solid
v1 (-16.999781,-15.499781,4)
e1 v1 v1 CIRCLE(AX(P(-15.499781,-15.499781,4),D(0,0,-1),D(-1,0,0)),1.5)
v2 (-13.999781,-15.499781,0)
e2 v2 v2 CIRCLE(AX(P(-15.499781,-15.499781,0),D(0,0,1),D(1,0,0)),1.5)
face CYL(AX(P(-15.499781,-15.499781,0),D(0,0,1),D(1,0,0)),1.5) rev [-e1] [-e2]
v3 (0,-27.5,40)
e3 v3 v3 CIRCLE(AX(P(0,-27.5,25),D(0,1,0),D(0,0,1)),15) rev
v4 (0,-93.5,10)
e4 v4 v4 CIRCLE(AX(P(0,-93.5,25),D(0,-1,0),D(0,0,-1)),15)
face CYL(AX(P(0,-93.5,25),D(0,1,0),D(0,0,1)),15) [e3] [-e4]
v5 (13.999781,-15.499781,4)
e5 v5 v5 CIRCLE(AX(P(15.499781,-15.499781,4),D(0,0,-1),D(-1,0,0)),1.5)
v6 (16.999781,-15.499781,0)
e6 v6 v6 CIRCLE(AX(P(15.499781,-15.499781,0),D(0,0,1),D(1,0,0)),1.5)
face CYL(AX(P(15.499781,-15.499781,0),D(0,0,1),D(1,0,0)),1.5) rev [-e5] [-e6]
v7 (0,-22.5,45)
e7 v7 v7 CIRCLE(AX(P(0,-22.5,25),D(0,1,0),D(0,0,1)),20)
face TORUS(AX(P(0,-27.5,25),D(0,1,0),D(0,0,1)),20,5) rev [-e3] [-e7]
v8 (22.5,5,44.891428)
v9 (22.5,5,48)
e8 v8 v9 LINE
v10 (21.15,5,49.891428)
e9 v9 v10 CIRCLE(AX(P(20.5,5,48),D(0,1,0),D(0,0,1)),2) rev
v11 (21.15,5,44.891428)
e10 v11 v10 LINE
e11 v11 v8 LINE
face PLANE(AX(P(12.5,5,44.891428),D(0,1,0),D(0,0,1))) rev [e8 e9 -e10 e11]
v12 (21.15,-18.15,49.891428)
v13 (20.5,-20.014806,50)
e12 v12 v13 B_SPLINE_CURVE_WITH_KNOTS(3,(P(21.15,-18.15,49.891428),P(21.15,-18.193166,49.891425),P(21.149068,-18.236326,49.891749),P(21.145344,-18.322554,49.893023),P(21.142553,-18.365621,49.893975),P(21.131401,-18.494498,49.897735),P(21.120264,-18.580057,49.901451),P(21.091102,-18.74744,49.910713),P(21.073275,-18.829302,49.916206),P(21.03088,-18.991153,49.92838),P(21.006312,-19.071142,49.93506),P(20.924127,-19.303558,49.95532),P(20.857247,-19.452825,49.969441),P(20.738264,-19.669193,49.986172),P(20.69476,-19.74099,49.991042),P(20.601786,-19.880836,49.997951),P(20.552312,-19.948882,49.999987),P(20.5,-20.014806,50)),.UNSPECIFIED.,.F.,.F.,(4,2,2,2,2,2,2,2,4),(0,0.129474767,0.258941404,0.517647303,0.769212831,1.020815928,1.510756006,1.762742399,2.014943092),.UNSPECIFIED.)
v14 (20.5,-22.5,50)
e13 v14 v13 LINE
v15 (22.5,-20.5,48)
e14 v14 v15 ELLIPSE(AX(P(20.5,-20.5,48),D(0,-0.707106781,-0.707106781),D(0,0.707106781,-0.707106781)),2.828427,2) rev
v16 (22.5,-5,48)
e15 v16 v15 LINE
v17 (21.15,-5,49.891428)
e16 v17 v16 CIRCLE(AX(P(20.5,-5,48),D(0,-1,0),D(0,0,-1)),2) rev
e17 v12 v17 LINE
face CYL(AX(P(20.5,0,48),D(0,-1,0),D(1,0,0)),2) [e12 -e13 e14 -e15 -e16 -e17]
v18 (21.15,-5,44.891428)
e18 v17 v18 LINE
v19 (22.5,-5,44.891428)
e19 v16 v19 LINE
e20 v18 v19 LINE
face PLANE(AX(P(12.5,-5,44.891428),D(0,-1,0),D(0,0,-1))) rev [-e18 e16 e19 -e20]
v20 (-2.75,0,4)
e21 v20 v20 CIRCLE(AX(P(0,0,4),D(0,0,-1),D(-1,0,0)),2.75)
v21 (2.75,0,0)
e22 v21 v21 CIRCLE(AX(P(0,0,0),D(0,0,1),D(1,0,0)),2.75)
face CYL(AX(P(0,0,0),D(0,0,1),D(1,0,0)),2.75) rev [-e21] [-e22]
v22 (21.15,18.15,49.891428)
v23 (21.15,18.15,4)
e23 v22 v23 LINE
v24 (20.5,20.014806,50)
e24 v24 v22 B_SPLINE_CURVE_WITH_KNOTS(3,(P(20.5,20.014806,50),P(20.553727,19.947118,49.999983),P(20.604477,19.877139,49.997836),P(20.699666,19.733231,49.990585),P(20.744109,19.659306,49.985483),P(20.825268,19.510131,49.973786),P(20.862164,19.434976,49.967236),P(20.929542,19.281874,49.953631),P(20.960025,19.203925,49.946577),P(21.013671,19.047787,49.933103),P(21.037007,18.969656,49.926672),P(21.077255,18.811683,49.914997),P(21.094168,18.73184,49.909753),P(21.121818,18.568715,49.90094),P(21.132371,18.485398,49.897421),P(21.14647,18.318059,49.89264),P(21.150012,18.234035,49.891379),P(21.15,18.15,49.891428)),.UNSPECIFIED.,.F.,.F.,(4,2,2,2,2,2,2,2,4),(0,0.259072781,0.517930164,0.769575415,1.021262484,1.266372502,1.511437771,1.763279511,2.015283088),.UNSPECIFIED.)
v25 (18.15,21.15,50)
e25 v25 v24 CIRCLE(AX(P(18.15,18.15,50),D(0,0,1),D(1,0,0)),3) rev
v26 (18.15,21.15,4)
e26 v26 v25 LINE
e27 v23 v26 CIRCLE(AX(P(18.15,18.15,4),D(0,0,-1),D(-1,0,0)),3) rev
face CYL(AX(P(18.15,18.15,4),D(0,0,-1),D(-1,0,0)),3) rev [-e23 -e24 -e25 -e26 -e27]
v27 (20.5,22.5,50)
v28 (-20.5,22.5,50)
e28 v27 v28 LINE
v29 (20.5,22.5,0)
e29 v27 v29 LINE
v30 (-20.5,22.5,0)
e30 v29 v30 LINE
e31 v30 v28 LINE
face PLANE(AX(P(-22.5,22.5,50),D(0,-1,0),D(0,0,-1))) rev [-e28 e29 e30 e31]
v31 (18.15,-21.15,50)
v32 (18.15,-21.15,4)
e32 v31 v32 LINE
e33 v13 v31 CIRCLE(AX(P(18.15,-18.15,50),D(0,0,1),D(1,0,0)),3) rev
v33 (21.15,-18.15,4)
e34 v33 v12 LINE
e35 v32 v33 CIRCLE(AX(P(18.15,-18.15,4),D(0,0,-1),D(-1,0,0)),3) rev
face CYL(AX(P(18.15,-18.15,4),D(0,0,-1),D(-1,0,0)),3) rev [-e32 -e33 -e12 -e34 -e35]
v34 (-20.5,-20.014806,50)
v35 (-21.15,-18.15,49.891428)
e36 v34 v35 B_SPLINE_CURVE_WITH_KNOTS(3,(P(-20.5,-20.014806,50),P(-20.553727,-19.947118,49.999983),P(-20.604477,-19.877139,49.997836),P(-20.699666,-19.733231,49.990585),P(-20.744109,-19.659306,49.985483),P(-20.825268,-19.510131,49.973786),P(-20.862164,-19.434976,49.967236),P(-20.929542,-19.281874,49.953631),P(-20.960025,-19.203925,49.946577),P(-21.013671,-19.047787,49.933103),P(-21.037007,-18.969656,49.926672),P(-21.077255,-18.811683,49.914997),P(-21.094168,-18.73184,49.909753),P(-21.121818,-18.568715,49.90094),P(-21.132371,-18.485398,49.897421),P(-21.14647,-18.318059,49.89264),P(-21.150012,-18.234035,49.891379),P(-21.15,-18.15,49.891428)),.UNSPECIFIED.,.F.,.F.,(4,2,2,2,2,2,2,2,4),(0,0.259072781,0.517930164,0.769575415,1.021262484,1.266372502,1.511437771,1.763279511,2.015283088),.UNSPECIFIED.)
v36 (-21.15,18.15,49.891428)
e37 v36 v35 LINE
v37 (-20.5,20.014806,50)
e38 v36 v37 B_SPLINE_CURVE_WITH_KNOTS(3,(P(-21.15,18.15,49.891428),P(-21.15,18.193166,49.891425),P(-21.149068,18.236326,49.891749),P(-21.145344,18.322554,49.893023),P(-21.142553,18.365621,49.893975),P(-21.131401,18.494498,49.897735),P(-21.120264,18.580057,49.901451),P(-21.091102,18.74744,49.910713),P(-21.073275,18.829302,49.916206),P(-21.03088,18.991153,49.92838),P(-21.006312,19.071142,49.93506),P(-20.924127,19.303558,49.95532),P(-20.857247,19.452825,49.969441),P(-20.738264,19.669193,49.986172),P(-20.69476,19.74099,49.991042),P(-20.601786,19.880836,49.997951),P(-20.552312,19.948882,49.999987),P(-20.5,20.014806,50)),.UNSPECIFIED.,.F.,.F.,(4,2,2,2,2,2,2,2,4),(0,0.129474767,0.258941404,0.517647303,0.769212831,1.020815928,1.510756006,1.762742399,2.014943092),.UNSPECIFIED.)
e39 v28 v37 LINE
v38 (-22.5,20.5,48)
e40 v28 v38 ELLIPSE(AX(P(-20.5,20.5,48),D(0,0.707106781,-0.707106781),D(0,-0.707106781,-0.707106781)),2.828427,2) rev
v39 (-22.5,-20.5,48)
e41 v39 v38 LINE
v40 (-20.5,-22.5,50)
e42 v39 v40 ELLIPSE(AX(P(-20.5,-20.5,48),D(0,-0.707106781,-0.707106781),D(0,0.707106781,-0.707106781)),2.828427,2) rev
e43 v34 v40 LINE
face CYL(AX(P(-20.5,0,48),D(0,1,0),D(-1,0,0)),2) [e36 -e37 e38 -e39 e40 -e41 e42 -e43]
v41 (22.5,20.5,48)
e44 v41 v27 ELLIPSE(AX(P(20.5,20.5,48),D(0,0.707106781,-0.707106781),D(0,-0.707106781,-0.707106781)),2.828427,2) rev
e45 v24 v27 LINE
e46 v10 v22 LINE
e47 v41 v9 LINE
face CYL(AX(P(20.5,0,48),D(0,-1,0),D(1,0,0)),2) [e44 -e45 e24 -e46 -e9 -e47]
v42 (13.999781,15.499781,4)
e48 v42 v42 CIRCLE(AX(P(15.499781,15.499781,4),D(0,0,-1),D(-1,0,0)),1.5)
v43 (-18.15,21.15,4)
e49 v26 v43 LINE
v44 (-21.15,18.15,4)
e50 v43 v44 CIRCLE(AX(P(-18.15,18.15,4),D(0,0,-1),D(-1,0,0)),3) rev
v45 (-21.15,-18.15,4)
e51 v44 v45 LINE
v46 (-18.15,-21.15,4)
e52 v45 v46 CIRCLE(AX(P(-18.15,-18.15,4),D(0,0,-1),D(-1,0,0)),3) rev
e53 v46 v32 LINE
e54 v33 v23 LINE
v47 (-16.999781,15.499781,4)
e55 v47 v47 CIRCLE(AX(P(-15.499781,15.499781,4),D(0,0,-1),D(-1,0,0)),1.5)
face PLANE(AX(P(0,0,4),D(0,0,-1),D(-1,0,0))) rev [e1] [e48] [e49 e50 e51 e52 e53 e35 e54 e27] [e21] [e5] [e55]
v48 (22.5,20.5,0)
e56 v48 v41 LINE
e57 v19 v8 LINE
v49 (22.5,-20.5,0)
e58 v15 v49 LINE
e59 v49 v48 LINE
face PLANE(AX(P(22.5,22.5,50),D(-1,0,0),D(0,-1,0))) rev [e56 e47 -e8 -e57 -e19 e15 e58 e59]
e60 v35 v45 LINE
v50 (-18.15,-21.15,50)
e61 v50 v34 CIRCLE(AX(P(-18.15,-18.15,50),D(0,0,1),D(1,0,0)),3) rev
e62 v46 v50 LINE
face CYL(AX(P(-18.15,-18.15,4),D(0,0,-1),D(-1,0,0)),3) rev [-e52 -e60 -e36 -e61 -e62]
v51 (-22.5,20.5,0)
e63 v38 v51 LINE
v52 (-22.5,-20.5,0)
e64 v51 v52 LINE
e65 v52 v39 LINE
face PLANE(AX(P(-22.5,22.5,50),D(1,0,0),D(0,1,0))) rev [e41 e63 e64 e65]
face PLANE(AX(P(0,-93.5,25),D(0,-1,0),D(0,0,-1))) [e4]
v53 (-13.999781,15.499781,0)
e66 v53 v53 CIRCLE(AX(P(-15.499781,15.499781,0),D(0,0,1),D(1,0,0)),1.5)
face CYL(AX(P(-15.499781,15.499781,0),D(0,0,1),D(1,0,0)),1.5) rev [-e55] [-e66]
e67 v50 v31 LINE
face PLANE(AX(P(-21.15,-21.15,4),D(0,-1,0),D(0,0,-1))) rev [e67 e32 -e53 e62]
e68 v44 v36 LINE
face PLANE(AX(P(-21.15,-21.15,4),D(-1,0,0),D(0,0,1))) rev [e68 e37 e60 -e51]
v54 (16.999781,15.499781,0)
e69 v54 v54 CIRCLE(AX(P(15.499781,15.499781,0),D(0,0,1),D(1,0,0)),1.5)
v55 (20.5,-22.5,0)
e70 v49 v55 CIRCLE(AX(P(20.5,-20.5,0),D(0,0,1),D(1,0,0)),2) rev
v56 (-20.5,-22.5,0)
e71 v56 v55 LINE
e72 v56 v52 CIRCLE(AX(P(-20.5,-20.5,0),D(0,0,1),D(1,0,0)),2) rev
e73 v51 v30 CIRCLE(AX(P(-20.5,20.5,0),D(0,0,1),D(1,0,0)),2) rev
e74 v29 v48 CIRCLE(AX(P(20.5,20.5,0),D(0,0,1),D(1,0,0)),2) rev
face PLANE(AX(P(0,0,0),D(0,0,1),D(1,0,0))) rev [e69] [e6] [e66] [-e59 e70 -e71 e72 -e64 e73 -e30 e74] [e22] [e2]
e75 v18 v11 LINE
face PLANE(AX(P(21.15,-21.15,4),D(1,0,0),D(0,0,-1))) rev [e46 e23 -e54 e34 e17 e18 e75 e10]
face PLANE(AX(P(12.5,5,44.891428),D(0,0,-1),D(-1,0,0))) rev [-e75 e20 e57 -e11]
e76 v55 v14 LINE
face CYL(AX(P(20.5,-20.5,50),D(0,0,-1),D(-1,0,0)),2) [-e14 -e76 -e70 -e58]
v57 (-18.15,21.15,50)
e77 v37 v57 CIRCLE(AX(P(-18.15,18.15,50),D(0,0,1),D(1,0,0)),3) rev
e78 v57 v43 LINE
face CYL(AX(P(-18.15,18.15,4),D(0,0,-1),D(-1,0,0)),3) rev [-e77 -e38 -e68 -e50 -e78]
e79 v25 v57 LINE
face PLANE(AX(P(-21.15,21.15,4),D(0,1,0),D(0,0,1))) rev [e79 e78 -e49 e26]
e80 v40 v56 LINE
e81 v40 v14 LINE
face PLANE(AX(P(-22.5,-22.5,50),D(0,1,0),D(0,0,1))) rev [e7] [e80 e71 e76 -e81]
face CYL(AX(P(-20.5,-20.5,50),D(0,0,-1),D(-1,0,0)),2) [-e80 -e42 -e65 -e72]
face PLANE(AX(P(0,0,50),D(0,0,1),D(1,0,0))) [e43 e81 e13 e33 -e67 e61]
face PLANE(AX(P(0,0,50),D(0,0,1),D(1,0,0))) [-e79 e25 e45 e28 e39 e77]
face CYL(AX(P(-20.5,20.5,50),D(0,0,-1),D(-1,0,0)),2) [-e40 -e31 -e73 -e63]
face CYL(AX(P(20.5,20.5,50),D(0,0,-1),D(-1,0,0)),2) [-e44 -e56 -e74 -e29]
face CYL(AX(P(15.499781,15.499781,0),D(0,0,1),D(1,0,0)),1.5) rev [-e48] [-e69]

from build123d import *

# Parameters (mm, degrees)
SKETCH1_W               = 45
SKETCH1_H               = 45
BOSS_EXTRUDE1_DEPTH     = 50
SKETCH2_W               = 42.3
SKETCH2_H               = 42.3
CUT_EXTRUDE1_DEPTH      = 46
CUT_EXTRUDE2_DEPTH      = 56.932995629
CUT_EXTRUDE2_DEPTH_BACK = 56.932995629
SKETCH3_R               = 1.5
SKETCH3_R_2             = 2.75
SKETCH4_R               = 15
BOSS_EXTRUDE2_DEPTH     = 71
FILLET1_R               = 2
FILLET2_R               = 5
FILLET3_R               = 3
SKETCH7_W               = 5
SKETCH7_H               = 10
CUT_EXTRUDE3_DEPTH      = 10


with BuildPart() as part:
    # Sketch1 → Boss-Extrude1 (new body)
    with BuildSketch(Plane.XY):
        Rectangle(SKETCH1_W, SKETCH1_H)
    extrude(amount=BOSS_EXTRUDE1_DEPTH)

    # Sketch2 → Cut-Extrude1 (cut)
    with BuildSketch(Plane.XY.offset(50)):
        Rectangle(SKETCH2_W, SKETCH2_H)
    extrude(amount=-CUT_EXTRUDE1_DEPTH, mode=Mode.SUBTRACT)

    # Sketch3 → Cut-Extrude2 (cut, two sides: drawn at the far end of the back side and taken through both)
    with BuildSketch(Plane.XY.offset(4).offset(-CUT_EXTRUDE2_DEPTH_BACK)):
        with Locations((-15.499780644, 15.499780644)):
            Circle(SKETCH3_R)
        with Locations((15.499780644, 15.499780644)):
            Circle(SKETCH3_R)
        with Locations((15.499780644, -15.499780644)):
            Circle(SKETCH3_R)
        with Locations((-15.499780644, -15.499780644)):
            Circle(SKETCH3_R)
        Circle(SKETCH3_R_2)
    extrude(amount=CUT_EXTRUDE2_DEPTH + CUT_EXTRUDE2_DEPTH_BACK, mode=Mode.SUBTRACT)

    # Sketch4 → Boss-Extrude2 (add)
    with BuildSketch(Plane.XZ.offset(22.5)):
        with Locations(Location((0, 25, 0), (0, 0, 270))):
            Circle(SKETCH4_R)
    extrude(amount=BOSS_EXTRUDE2_DEPTH)

    # Fillet1
    # the kernel refuses this fillet: 2 mm, written as the material it takes off along each edge
    with BuildSketch(Plane(origin=(-22.5, -27.5, 50), x_dir=(0, 0, -1), z_dir=(0, 1, 0)), Plane(origin=(22.5, 27.5, 50), x_dir=(0, 0, -1), z_dir=(0, -1, 0))) as fillet1_piece_1:
        with BuildLine():
            CenterArc((FILLET1_R, -FILLET1_R), FILLET1_R, 90, 90)
            Line((0, -FILLET1_R), (0, 0))
            Line((0, 0), (FILLET1_R, 0))
        make_face()
    extrude(amount=55, mode=Mode.SUBTRACT)
    with BuildSketch(Plane(origin=(22.5, -22.5, -5), x_dir=(0, 1, 0), z_dir=(0, 0, 1)), Plane(origin=(22.5, 22.5, -5), x_dir=(-1, 0, 0), z_dir=(0, 0, 1))) as fillet1_piece_2:
        with BuildLine():
            CenterArc((FILLET1_R, FILLET1_R), FILLET1_R, 180, 90)
            Line((0, FILLET1_R), (0, 0))
            Line((0, 0), (FILLET1_R, 0))
        make_face()
    extrude(amount=60, mode=Mode.SUBTRACT)
    with BuildSketch(Plane(origin=(-22.5, -22.5, -5), x_dir=(0, 1, 0), z_dir=(0, 0, 1)), Plane(origin=(-22.5, 22.5, -5), x_dir=(1, 0, 0), z_dir=(0, 0, 1))) as fillet1_piece_3:
        with BuildLine():
            CenterArc((FILLET1_R, -FILLET1_R), FILLET1_R, 90, 90)
            Line((0, -FILLET1_R), (0, 0))
            Line((0, 0), (FILLET1_R, 0))
        make_face()
    extrude(amount=60, mode=Mode.SUBTRACT)

    # Fillet2
    fillet2_edges = [part.edges().sort_by_distance(p)[0] for p in [
        (0, -22.5, 40),
    ]]
    fillet(fillet2_edges, radius=FILLET2_R)

    # Fillet3
    fillet3_edges = [part.edges().sort_by_distance(p)[0] for p in [
        (-21.15, -21.15, 26.945714016),
        (21.15, 21.15, 26.945714016),
        (-21.15, 21.15, 26.945714016),
        (21.15, -21.15, 26.945714016),
    ]]
    fillet(fillet3_edges, radius=FILLET3_R)

    # Sketch7 → Cut-Extrude3 (cut)
    with BuildSketch(Plane(origin=(22.5, 0, 0), x_dir=(0, 0, -1), z_dir=(1, 0, 0))):
        with Locations((-47.391428032, 0)):
            Rectangle(SKETCH7_W, SKETCH7_H)
    extrude(amount=-CUT_EXTRUDE3_DEPTH, mode=Mode.SUBTRACT)


solid = part.part
